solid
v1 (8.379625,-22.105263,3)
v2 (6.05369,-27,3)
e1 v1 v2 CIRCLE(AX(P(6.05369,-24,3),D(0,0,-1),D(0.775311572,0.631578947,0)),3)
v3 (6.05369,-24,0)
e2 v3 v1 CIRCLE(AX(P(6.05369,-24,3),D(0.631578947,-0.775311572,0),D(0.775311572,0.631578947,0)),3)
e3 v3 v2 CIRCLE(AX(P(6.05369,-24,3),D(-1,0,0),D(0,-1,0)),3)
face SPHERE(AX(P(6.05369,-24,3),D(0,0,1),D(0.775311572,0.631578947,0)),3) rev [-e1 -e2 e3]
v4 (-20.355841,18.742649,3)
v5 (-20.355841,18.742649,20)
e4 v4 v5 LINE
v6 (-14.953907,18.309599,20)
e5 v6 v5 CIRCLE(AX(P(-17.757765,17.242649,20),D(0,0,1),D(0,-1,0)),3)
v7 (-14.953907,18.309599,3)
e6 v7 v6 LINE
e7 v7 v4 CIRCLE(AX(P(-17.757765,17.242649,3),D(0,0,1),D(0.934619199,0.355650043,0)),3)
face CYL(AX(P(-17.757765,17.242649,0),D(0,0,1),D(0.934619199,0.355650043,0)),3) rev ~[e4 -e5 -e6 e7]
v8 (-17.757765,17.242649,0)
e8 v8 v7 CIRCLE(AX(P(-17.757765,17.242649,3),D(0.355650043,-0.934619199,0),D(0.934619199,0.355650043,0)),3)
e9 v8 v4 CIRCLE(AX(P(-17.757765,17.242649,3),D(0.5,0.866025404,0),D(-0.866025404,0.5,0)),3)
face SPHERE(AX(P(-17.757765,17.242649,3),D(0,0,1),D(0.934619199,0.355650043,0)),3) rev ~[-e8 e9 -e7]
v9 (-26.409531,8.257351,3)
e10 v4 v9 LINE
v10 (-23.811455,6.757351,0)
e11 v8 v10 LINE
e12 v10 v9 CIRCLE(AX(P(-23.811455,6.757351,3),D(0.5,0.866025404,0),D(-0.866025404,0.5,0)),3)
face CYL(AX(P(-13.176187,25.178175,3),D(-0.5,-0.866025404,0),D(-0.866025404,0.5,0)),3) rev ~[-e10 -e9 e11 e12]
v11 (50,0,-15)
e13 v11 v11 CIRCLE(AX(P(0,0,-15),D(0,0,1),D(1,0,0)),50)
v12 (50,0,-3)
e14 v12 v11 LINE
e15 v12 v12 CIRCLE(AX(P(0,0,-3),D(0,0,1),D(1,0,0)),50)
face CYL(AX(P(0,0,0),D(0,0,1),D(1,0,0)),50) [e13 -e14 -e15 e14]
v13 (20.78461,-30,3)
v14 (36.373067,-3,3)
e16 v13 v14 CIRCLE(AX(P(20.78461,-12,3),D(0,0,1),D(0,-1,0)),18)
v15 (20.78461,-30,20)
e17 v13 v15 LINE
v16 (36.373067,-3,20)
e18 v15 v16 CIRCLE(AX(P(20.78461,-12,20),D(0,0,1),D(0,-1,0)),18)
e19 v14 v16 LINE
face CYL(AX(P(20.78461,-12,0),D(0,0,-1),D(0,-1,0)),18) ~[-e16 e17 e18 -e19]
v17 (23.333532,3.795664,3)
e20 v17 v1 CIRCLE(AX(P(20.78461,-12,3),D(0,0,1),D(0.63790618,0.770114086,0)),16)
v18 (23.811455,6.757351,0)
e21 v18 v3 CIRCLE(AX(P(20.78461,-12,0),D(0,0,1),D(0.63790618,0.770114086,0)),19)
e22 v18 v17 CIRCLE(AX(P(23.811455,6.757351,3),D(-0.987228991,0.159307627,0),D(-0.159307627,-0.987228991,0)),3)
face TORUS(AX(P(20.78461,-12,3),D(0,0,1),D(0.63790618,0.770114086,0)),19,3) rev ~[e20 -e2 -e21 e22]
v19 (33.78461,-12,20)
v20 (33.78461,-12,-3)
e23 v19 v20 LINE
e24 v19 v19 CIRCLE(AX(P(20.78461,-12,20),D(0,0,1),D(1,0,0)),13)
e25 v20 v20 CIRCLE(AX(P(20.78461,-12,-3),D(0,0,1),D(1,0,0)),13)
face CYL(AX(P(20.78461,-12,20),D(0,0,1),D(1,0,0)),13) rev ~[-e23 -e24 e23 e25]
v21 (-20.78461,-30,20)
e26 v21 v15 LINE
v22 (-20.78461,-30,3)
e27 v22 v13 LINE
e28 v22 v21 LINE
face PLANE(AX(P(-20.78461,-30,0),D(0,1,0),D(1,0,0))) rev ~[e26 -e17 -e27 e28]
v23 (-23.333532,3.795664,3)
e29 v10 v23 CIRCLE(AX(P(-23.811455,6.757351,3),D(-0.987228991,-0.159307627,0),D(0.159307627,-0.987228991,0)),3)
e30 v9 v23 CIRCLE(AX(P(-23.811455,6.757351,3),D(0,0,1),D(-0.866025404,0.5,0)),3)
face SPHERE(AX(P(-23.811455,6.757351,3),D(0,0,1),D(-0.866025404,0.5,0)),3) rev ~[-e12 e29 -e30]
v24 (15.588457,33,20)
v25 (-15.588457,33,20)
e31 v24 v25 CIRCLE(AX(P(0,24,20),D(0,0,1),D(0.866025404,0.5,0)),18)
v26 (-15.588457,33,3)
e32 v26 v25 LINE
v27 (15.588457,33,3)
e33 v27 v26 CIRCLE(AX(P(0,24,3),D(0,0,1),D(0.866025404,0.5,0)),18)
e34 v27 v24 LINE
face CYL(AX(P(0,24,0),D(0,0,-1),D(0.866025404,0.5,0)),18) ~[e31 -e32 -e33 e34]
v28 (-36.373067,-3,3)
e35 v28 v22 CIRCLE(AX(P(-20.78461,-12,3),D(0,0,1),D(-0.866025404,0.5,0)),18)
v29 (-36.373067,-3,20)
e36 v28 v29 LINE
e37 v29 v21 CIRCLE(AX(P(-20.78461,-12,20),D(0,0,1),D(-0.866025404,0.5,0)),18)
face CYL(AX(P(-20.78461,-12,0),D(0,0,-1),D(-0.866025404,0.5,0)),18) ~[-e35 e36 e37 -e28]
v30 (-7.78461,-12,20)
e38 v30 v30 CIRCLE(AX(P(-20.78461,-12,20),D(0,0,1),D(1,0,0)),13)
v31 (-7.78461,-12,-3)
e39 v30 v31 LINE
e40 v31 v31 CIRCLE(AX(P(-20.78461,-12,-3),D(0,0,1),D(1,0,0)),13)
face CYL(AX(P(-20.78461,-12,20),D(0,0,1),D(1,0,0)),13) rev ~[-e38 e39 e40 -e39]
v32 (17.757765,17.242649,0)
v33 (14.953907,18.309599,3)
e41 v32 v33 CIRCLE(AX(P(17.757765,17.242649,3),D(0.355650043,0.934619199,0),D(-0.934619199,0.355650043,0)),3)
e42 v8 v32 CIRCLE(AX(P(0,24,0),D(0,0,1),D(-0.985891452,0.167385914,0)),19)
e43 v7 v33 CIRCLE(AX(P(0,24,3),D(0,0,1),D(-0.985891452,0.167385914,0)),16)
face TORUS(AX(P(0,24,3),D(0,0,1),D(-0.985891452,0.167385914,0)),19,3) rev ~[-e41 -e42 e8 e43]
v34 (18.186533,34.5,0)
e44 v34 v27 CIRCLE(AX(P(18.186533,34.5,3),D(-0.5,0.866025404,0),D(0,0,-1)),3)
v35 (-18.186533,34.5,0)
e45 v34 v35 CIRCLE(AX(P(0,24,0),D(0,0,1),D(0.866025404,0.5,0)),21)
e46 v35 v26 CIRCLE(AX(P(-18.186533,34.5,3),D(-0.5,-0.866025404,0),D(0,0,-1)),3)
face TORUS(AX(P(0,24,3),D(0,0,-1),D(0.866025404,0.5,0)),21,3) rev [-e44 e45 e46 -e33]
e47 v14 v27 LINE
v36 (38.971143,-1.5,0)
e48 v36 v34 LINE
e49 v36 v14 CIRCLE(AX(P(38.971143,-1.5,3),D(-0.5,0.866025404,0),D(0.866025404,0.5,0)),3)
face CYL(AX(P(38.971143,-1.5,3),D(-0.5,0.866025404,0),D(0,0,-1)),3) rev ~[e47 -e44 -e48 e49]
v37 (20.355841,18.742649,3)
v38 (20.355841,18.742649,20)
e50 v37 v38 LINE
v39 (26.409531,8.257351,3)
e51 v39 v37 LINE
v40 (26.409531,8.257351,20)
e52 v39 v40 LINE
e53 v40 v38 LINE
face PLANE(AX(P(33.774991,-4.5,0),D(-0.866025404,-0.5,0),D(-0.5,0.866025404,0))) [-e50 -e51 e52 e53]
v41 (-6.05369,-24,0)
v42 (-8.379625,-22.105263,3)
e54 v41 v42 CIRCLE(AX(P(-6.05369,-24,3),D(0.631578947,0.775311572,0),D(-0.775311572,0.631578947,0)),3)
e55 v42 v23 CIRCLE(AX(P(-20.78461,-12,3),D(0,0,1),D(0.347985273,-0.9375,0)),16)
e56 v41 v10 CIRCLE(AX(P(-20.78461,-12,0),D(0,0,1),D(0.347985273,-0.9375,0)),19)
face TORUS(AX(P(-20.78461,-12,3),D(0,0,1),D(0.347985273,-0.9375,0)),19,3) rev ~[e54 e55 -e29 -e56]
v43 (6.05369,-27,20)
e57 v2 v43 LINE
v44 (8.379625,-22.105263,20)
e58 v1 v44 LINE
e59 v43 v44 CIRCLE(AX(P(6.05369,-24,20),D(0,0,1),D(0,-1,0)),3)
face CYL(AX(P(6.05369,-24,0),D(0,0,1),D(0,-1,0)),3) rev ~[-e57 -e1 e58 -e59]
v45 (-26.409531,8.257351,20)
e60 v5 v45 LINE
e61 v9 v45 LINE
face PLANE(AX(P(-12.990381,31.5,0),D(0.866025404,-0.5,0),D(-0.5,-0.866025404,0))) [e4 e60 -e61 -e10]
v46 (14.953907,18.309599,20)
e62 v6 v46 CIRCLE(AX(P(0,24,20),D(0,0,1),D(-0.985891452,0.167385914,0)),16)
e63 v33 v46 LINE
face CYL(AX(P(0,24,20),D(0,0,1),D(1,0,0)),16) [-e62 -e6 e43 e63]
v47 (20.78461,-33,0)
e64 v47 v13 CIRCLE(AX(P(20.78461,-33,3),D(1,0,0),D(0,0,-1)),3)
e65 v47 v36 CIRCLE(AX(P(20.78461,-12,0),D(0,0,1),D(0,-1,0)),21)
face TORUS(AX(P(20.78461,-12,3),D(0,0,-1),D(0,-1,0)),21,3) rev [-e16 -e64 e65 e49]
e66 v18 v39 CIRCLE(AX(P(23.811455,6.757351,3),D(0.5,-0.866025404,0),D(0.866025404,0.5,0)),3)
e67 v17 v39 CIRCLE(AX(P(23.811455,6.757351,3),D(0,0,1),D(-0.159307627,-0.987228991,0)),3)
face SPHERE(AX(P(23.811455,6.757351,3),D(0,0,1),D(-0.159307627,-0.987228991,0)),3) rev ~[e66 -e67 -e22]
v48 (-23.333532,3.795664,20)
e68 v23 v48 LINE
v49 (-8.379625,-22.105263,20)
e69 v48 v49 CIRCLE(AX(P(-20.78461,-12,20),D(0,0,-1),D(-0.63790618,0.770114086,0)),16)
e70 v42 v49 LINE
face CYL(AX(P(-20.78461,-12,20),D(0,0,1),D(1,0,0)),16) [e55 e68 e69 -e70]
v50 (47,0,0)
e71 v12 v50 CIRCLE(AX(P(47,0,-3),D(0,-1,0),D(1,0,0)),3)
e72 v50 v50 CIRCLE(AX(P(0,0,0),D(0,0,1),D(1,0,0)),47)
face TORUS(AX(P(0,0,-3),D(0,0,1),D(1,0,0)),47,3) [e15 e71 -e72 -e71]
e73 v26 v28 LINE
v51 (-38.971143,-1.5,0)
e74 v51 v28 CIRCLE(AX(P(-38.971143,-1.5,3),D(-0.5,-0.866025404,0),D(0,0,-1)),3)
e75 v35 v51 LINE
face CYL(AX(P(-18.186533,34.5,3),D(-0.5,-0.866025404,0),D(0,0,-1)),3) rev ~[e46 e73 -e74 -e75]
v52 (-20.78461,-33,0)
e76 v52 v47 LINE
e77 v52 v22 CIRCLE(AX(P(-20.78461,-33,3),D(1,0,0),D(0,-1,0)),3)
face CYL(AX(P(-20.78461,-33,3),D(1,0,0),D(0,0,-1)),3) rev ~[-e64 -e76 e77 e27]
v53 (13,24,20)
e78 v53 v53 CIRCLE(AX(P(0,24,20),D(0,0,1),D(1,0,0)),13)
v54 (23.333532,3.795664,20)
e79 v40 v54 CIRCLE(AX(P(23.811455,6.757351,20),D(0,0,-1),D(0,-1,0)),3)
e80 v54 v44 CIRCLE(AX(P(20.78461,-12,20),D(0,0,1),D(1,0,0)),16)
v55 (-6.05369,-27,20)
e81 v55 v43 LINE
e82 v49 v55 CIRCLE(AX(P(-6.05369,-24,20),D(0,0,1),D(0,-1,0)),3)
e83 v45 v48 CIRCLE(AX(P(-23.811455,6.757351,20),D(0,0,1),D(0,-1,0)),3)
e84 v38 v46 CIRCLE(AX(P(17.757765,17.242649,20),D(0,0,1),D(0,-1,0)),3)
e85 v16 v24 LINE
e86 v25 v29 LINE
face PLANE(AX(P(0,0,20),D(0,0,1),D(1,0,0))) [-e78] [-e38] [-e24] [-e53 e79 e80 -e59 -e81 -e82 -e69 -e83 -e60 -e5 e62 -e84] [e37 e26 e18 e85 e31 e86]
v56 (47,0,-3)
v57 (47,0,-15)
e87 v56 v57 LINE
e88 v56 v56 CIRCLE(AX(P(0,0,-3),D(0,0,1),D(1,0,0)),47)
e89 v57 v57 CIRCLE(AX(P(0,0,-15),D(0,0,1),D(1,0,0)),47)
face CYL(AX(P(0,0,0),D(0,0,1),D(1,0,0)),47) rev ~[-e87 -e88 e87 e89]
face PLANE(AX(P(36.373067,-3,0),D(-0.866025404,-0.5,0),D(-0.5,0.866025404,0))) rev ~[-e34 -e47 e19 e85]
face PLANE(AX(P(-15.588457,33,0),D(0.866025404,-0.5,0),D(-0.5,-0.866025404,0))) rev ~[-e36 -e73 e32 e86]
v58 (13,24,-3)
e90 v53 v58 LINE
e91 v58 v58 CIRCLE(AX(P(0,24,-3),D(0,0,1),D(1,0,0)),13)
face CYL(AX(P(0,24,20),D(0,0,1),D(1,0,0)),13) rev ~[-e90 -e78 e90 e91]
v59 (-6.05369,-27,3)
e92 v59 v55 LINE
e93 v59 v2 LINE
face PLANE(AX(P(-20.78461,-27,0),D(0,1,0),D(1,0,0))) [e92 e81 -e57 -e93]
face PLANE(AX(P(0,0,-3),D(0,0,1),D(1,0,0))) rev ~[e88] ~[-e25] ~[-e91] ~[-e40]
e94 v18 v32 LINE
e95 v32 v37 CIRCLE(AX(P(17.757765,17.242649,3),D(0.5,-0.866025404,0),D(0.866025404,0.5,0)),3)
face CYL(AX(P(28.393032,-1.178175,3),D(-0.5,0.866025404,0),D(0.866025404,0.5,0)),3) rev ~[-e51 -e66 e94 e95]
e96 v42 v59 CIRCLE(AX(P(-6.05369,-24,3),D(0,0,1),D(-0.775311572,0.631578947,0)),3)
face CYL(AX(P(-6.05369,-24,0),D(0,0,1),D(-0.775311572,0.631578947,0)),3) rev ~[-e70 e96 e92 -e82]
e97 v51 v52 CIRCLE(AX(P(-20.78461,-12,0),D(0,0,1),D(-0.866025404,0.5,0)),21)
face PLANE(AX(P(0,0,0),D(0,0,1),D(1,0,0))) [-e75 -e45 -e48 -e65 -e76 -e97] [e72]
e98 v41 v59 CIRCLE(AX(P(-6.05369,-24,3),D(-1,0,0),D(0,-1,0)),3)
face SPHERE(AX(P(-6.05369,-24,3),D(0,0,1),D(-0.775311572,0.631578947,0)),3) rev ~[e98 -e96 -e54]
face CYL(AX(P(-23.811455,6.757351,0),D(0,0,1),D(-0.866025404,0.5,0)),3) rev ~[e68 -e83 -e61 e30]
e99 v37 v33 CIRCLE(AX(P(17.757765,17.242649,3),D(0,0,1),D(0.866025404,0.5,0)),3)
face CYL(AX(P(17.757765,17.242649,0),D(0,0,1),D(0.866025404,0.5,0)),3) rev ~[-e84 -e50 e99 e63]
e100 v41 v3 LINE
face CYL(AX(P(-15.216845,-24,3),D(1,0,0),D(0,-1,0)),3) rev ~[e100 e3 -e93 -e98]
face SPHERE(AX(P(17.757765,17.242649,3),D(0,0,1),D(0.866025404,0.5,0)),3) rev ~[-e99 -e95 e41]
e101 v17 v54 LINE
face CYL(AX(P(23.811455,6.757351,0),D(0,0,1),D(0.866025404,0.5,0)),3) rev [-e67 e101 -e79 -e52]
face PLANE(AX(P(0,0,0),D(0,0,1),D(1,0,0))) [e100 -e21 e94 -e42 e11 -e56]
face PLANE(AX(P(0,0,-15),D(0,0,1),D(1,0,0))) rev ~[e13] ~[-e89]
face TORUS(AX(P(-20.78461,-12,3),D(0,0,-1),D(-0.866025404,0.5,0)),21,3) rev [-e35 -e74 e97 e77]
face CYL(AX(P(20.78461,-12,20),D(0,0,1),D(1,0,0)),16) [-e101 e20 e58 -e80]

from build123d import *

# Parameters (mm, degrees)
F0_R         = 50
F1_DEPTH     = 15
F2_T         = -3
F4_DEPTH     = 20
F5_R         = 13
F6_DEPTH     = 35.001
F7_T         = 3
F7_T3_DEPTH  = 47.5692193817
F7_T5_DEPTH  = 47.5692193817
F7_T7_DEPTH  = 47.5692193817
F7_T10_ANGLE = 120.000000001
F7_T12_ANGLE = 120.000000001
F7_T14_ANGLE = 120.000000001
F8_R         = 3


# Not quite as in the source:
# - a shell that OpenCascade refuses in one call is made with other operations: the cavity is built on its own and cut out


with BuildPart() as f1:
    # F0 (on Top) → F1 (new body)
    with BuildSketch(Plane.XY):
        Circle(F0_R)
    extrude(amount=-F1_DEPTH)

    # F2
    f2_openings = [f1.faces().sort_by_distance(p)[0] for p in [
        (0, 0, -15),
    ]]
    offset(amount=F2_T, openings=f2_openings)

    # F3 (on face) → F4 (join)
    with BuildSketch(Plane.XY):
        with BuildLine():
            Line((36.3730669589, -3), (15.5884572681, 33))
            ThreePointArc((15.5884572681, 33), (0, 42), (-15.5884572681, 33))
            Line((-15.5884572681, 33), (-36.3730669589, -3))
            ThreePointArc((-36.3730669589, -3), (-36.3730669589, -21), (-20.7846096908, -30))
            Line((-20.7846096908, -30), (20.7846096908, -30))
            ThreePointArc((20.7846096908, -30), (36.3730669589, -21), (36.3730669589, -3))
        make_face()
    extrude(amount=F4_DEPTH)

    # F5 (on face) → F6 (cut, through all)
    with BuildSketch(Plane.XY.offset(20)):
        with Locations((0, 24)):
            Circle(F5_R)
        with Locations((-20.7846096908, -12)):
            Circle(F5_R)
        with Locations((20.7846096908, -12)):
            Circle(F5_R)
    extrude(amount=-F6_DEPTH, mode=Mode.SUBTRACT)

    # F7: shell of thickness 3, made by hand


with BuildPart() as f7_core1:
    # F7_t2: copy of F1
    add(f1.part)

    # the walls: a layer under each face that stays
    f7_faces = [f7_core1.faces().sort_by_distance(p)[0] for p in [
        (-50, 0, -7.5),
        (-33.3333333333, -33.3333333333, 0),
        (-33.3333333333, -33.3333333333, -15),
        (25.9807621135, 15, 10),
        (0, 42, 10),
        (-25.9807621135, 15, 10),
        (-36.3730669589, -21, 10),
        (0, -30, 10),
        (36.3730669589, -21, 10),
        (-47, 0, -9),
        (0, 0, -3),
        (-33.7846096908, -12, 8.5),
        (7.7846096908, -12, 8.5),
        (-13, 24, 8.5),
    ]]
    thicken(f7_faces, amount=-F7_T, mode=Mode.SUBTRACT)

    # F7_s4 → F7_t3 (cut)
    with BuildSketch(Plane(origin=(11.8923048454, -20.5980762114, 0), x_dir=(0, 0, 1), z_dir=(-0.5, 0.8660254038, 0))):
        Polygon((0.03, 30.03), (-3, 30), (-3, 27), (0, 27), align=None)
    extrude(amount=F7_T3_DEPTH, mode=Mode.SUBTRACT)

    # F7_s6 → F7_t5 (cut)
    with BuildSketch(Plane(origin=(11.8923048454, 20.5980762114, 0), x_dir=(0, 0, 1), z_dir=(-0.5, -0.8660254038, 0))):
        Polygon((0.03, 30.03), (-3, 30), (-3, 27), (0, 27), align=None)
    extrude(amount=F7_T5_DEPTH, mode=Mode.SUBTRACT)

    # F7_s8 → F7_t7 (cut)
    with BuildSketch(Plane.YZ.offset(-23.7846096908)):
        Polygon((-30.03, 0.03), (-30, -3), (-27, -3), (-27, 0), align=None)
    extrude(amount=F7_T7_DEPTH, mode=Mode.SUBTRACT)

    # F7_s9 → F7_t10 (revolve, cut)
    with BuildSketch(Plane(origin=(-10.3923048454, 18, 0), x_dir=(0, 0, 1), z_dir=(0.5, -0.8660254038, 0))):
        Polygon((0.03, -30.03), (-3, -30), (-3, -27), (0, -27), align=None)
    revolve(axis=Axis((0, 24, 0), (0, 0, 1)), revolution_arc=F7_T10_ANGLE, mode=Mode.SUBTRACT)

    # F7_s11 → F7_t12 (revolve, cut)
    with BuildSketch(Plane(origin=(-10.3923048454, -18, 0), x_dir=(0, 0, 1), z_dir=(0.5, 0.8660254038, 0))):
        Polygon((0.03, -30.03), (-3, -30), (-3, -27), (0, -27), align=None)
    revolve(axis=Axis((-20.7846096908, -12, 0), (0, 0, 1)), revolution_arc=F7_T12_ANGLE, mode=Mode.SUBTRACT)

    # F7_s13 → F7_t14 (revolve, cut)
    with BuildSketch(Plane.YZ.offset(20.7846096908)):
        Polygon((-30.03, 0.03), (-30, -3), (-27, -3), (-27, 0), align=None)
    revolve(axis=Axis((20.7846096908, -12, 0), (0, 0, 1)), revolution_arc=F7_T14_ANGLE, mode=Mode.SUBTRACT)

    # F7_s15 → F7_t16 (revolve, cut)
    with BuildSketch(Plane.XZ):
        Polygon((46.97, -3.03), (50, -3), (50, 0), (47, 0), align=None)
    revolve(axis=Axis((0, 0, -3), (0, 0, 1)), mode=Mode.SUBTRACT)


with BuildPart() as f1_1:
    add(f1.part)

    # what is left inside the walls is the cavity
    f7_cavity = [f7_core1.part.solids().sort_by_distance(p)[0] for p in [
        (6.902222, -3.985, 6.666667),
    ]]
    add(f7_cavity, mode=Mode.SUBTRACT)

    # F8
    f8_edges = [f1_1.edges().sort_by_distance(p)[0] for p in [
        (6.928203, -4, 0),
        (23.382686, 13.5, 0),
        (0, 8, 0),
        (-23.382686, 13.5, 0),
        (-6.928203, -4, 0),
        (0, -27, 0),
        (-25.980762, 15, 0),
        (-50, 0, 0),
        (25.980762, 15, 0),
        (0, 42, 0),
        (-36.373067, -21, 0),
        (0, -30, 0),
        (36.373067, -21, 0),
        (15.774263, 26.678175, 10),
        (30.991109, 0.321825, 10),
        (-15.774263, 26.678175, 10),
        (-30.991109, 0.321825, 10),
        (-15.216845, -27, 10),
        (15.216845, -27, 10),
    ]]
    fillet(f8_edges, radius=F8_R)


solid = f1_1.part
